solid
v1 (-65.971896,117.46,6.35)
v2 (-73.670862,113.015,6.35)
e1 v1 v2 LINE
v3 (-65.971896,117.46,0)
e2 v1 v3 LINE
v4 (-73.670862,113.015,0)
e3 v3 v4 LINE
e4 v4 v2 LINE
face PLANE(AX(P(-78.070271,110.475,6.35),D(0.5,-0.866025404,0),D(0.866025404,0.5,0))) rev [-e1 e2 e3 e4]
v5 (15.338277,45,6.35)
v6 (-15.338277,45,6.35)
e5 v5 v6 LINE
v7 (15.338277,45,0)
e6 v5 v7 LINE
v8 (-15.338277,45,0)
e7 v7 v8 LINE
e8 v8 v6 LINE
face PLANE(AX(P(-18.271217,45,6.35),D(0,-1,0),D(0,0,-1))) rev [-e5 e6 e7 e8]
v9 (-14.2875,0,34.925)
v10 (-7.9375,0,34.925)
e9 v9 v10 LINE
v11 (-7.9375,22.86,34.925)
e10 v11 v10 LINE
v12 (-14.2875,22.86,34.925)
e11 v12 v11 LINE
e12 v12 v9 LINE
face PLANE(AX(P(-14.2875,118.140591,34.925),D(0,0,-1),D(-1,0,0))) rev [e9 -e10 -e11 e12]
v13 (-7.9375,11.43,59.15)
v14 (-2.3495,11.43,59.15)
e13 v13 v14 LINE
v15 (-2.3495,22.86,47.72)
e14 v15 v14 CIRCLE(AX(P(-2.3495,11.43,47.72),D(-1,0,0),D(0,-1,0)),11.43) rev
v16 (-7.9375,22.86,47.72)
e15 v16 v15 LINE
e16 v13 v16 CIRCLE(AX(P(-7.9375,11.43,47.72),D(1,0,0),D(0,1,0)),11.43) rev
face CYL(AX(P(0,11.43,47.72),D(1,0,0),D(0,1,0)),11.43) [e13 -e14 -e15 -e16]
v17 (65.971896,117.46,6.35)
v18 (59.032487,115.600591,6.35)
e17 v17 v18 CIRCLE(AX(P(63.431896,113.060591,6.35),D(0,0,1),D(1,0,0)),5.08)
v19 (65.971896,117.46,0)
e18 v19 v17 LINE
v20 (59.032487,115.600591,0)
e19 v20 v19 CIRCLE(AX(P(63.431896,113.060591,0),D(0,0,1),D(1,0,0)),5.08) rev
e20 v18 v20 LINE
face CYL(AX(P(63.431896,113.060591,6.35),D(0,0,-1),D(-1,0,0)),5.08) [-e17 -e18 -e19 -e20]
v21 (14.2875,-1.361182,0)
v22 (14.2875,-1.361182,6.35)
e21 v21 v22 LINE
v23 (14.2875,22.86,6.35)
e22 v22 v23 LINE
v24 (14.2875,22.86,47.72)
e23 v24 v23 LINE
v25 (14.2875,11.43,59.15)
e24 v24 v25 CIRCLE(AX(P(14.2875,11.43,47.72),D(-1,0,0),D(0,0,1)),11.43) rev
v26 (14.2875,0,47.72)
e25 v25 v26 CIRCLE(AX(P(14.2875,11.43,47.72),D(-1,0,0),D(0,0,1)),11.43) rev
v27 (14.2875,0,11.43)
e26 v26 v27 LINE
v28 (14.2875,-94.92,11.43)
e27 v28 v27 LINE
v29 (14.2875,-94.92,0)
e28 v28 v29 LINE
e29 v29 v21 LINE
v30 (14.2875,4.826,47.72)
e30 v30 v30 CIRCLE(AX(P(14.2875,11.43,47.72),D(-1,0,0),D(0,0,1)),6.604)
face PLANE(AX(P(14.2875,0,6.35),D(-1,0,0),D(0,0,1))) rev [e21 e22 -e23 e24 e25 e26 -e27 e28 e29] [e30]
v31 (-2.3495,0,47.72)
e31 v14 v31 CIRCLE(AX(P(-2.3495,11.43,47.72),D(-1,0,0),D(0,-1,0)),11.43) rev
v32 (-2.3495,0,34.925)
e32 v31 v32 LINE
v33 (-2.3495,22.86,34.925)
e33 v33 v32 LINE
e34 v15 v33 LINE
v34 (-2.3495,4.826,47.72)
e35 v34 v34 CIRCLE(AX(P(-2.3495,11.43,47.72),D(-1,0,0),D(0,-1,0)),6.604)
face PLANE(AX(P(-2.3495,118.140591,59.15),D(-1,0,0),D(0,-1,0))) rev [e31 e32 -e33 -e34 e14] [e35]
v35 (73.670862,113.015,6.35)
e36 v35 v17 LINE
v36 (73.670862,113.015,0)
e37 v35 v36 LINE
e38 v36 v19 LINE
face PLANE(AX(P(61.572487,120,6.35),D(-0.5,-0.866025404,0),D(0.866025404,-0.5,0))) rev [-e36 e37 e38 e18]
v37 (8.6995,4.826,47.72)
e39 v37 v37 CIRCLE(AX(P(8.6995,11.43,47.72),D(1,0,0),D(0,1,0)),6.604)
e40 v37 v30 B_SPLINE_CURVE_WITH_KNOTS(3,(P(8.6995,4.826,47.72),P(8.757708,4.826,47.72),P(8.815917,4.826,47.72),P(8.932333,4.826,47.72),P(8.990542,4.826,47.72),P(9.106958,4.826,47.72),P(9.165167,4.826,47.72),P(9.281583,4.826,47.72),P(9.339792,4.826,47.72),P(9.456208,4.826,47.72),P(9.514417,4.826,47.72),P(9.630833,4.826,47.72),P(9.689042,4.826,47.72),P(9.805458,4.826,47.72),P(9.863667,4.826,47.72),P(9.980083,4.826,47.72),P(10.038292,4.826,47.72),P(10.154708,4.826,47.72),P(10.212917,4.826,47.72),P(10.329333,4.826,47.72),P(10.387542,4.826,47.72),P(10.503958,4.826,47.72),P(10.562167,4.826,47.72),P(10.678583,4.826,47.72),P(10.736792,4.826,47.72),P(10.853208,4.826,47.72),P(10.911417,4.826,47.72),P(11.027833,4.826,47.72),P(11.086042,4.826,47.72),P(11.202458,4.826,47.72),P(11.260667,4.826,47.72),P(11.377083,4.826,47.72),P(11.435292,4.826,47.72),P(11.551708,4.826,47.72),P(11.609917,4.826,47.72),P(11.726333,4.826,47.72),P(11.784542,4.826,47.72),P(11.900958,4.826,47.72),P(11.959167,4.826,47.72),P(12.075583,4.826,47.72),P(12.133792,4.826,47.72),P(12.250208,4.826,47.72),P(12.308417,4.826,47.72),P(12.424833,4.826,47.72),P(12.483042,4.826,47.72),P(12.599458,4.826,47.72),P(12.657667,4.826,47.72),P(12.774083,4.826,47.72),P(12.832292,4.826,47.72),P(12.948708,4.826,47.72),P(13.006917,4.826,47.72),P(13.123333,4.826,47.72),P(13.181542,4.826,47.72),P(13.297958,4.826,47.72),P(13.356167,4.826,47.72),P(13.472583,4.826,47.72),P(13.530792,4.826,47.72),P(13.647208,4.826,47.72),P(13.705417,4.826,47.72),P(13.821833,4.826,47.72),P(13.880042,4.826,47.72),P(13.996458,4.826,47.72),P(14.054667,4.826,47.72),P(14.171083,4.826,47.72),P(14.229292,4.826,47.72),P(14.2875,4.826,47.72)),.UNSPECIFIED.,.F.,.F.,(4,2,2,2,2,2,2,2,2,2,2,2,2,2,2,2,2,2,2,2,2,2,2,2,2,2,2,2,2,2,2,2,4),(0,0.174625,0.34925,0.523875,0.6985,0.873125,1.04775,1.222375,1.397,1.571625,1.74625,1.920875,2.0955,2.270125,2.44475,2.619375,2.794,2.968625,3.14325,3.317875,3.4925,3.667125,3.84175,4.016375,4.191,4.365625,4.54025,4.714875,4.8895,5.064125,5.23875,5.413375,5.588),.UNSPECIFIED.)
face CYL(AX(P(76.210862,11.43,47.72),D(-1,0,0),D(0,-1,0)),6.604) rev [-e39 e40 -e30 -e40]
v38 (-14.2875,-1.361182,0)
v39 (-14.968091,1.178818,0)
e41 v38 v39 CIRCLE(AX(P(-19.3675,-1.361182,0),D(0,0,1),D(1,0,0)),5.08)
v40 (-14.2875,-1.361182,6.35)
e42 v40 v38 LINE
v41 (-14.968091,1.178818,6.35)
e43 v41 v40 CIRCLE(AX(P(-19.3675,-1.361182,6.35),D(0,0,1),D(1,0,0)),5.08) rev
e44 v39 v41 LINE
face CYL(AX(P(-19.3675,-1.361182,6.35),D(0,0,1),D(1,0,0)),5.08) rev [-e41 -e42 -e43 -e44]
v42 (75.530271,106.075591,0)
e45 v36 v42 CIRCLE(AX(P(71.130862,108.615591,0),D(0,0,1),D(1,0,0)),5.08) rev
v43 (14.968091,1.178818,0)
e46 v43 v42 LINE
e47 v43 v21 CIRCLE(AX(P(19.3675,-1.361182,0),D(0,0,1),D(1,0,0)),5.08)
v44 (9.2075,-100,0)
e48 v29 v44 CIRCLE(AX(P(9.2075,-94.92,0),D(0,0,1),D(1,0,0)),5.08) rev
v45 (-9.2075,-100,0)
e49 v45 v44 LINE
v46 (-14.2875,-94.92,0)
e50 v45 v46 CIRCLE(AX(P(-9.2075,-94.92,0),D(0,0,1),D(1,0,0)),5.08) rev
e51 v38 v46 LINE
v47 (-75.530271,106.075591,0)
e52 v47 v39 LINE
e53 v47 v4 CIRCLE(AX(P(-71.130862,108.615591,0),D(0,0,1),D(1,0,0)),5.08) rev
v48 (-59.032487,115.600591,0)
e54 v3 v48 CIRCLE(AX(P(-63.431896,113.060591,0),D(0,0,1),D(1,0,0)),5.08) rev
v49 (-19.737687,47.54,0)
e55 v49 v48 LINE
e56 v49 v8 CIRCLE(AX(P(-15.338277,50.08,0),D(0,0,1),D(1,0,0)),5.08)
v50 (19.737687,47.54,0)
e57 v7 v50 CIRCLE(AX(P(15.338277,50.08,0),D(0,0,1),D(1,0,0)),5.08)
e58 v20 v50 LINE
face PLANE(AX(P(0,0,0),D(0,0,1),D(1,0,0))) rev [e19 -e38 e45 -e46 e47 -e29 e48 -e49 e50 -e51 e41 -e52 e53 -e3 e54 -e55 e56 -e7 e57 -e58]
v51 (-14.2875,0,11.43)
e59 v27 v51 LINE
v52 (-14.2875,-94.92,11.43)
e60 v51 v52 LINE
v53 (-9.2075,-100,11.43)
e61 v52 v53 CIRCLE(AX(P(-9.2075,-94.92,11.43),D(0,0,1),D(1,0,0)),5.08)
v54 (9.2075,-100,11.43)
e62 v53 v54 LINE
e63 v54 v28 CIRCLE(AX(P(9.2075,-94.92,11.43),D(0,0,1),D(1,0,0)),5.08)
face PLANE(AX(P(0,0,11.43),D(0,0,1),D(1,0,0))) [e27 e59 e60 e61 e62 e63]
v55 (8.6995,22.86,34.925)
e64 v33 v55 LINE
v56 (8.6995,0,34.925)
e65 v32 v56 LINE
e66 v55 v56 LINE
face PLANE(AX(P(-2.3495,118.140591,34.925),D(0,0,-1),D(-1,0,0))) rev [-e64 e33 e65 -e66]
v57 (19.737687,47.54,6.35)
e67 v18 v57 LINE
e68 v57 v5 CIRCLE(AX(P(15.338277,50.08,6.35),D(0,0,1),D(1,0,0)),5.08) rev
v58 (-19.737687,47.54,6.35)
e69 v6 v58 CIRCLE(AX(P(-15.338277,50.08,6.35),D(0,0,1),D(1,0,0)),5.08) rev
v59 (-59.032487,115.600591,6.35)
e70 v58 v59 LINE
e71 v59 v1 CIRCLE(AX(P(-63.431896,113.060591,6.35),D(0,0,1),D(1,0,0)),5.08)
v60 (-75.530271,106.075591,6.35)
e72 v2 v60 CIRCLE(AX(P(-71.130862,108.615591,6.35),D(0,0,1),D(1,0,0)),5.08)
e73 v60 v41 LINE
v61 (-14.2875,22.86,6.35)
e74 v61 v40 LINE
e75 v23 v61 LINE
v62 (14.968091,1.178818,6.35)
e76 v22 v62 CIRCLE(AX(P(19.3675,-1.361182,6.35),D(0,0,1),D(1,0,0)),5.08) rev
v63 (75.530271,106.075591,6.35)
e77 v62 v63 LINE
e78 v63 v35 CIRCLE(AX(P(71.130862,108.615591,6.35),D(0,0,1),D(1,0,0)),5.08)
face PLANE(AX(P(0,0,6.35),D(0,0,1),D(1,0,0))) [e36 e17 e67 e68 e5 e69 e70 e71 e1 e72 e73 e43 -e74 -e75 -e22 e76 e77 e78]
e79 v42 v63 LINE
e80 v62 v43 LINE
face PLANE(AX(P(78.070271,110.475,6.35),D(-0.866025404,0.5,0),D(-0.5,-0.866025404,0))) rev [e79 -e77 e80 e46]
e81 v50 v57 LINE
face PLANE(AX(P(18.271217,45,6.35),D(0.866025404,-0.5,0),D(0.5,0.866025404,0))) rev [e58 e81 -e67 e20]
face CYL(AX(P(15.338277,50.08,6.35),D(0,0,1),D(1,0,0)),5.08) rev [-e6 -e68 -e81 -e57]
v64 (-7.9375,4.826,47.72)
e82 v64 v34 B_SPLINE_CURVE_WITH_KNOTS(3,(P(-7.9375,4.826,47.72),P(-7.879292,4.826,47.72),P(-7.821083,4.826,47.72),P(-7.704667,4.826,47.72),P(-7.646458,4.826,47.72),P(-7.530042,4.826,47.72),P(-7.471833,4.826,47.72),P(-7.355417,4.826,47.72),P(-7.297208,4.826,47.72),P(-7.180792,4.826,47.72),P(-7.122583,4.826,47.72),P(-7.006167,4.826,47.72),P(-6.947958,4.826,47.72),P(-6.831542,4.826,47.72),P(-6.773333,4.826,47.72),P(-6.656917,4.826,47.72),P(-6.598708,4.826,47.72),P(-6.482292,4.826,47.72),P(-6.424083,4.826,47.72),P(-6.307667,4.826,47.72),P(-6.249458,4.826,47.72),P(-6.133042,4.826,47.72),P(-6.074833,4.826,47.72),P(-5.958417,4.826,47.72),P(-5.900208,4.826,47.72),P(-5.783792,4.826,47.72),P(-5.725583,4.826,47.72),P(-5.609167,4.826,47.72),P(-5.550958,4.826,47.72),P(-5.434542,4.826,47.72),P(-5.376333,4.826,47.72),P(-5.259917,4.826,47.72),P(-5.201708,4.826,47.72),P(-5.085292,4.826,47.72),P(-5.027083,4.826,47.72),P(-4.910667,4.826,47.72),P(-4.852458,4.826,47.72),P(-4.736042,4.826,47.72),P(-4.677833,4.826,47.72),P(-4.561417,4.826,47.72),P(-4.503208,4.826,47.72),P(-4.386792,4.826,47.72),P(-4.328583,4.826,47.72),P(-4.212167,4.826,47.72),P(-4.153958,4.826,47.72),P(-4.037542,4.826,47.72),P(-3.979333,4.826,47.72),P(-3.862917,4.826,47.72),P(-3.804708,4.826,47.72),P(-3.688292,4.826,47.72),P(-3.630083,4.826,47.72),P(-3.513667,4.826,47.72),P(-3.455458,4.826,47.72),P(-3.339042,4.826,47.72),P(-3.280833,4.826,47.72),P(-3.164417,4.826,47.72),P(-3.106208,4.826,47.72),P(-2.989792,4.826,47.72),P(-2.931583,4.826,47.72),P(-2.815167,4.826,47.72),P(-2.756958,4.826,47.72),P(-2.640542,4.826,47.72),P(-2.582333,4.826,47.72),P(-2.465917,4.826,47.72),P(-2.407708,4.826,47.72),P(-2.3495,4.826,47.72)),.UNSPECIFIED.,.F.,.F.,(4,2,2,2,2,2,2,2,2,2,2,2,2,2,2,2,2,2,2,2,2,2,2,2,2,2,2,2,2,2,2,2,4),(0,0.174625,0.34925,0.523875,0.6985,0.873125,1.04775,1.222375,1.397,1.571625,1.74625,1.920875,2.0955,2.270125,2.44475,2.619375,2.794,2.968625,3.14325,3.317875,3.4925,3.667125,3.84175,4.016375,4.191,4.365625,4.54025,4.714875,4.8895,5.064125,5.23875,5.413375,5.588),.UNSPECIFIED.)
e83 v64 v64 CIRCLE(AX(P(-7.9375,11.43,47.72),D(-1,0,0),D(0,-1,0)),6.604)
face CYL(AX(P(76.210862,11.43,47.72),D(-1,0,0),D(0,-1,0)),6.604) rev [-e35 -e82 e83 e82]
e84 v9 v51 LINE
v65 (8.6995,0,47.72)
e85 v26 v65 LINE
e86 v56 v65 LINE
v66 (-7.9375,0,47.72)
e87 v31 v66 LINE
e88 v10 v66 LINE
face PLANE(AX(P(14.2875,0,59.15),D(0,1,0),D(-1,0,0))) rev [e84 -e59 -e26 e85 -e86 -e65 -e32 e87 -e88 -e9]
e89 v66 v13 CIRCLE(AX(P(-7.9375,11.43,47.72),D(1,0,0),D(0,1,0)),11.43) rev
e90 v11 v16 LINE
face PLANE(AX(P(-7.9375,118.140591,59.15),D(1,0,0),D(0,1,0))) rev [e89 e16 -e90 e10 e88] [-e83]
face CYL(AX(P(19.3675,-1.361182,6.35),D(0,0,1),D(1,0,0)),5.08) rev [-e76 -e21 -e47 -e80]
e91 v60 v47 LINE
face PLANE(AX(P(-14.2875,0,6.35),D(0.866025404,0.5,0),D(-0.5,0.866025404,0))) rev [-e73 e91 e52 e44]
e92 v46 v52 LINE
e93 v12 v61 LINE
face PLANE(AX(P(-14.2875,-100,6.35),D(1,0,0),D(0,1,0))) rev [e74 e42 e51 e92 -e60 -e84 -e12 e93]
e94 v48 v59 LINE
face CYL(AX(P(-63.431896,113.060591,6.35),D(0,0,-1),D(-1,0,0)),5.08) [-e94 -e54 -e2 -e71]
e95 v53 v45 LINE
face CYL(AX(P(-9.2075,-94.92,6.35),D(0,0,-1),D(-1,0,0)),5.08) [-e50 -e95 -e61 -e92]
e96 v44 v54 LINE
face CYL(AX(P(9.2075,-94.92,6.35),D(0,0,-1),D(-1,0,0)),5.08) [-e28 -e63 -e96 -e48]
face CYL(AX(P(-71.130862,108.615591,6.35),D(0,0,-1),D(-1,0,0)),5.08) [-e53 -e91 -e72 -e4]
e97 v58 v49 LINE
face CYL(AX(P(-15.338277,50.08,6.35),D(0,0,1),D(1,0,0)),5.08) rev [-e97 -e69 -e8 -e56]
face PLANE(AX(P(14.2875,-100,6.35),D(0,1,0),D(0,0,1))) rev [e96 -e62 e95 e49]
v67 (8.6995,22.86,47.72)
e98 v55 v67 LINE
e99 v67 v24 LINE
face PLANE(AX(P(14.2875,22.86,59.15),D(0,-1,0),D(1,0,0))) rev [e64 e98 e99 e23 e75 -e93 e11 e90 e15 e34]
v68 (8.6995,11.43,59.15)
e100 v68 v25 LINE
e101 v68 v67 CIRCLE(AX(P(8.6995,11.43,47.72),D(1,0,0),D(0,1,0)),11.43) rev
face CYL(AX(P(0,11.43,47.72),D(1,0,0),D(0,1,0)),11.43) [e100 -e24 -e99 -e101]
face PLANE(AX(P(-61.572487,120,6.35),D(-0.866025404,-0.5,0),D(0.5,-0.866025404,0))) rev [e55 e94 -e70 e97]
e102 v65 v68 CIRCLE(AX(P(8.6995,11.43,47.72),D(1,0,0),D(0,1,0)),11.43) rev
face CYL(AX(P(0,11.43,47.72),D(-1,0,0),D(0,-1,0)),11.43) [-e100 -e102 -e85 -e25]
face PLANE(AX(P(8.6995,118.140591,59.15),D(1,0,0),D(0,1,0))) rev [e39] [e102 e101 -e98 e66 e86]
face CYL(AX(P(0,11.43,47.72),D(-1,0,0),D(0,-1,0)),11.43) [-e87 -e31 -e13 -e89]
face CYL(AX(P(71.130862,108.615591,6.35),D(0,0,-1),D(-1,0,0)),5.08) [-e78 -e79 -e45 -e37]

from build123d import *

# Parameters (mm, degrees)
BOSS_EXTRUDE1_DEPTH = 6.35
SKETCH3_W           = 28.575
SKETCH3_H           = 22.86
BOSS_EXTRUDE2_DEPTH = 52.8
SKETCH6_W           = 28.575
SKETCH6_H           = 100
BOSS_EXTRUDE3_DEPTH = 5.08
FILLET1_R           = 5.08
SKETCH4_W           = 6.35
SKETCH4_H           = 24.225
SKETCH4_W_2         = 11.049
CUT_EXTRUDE1_DEPTH  = 153.525464126
FILLET3_R           = 11.43
SKETCH5_R           = 6.604
CUT_EXTRUDE2_DEPTH  = 157.642486403


with BuildPart() as part:
    # Sketch1 → Boss-Extrude1 (new body)
    with BuildSketch(Plane.XY):
        Polygon((-18.271216857, 45), (18.271216857, 45), (61.572487047, 120), (78.070270989, 110.475), (14.2875, 0), (14.2875, -100), (-14.2875, -100), (-14.2875, 0), (-78.070270989, 110.475), (-61.572487047, 120), align=None)
    extrude(amount=BOSS_EXTRUDE1_DEPTH)

    # Sketch3 → Boss-Extrude2 (add)
    with BuildSketch(Plane.XY.offset(6.35)):
        with Locations((0, 11.43)):
            Rectangle(SKETCH3_W, SKETCH3_H)
    extrude(amount=BOSS_EXTRUDE2_DEPTH)

    # Sketch6 → Boss-Extrude3 (add)
    with BuildSketch(Plane.XY.offset(6.35)):
        with Locations((0, -50)):
            Rectangle(SKETCH6_W, SKETCH6_H)
    extrude(amount=BOSS_EXTRUDE3_DEPTH)

    # Fillet1
    fillet1_edges = [part.edges().sort_by_distance(p)[0] for p in [
        (-18.271216857, 45, 3.175),
        (18.271216857, 45, 3.175),
        (61.572487047, 120, 3.175),
        (78.070270989, 110.475, 3.175),
        (14.2875, 0, 3.175),
        (14.2875, -100, 5.715),
        (-14.2875, -100, 5.715),
        (-14.2875, 0, 3.175),
        (-78.070270989, 110.475, 3.175),
        (-61.572487047, 120, 3.175),
    ]]
    fillet(fillet1_edges, radius=FILLET1_R)

    # Sketch4 → Cut-Extrude1 (cut, through all)
    with BuildSketch(Plane.XZ):
        with Locations((-11.1125, 47.0375)):
            Rectangle(SKETCH4_W, SKETCH4_H)
        with Locations((3.175, 47.0375)):
            Rectangle(SKETCH4_W_2, SKETCH4_H)
    extrude(amount=-CUT_EXTRUDE1_DEPTH, mode=Mode.SUBTRACT)

    # Fillet3
    fillet3_edges = [part.edges().sort_by_distance(p)[0] for p in [
        (11.4935, 22.86, 59.15),
        (-5.1435, 22.86, 59.15),
        (11.4935, 0, 59.15),
        (-5.1435, 0, 59.15),
    ]]
    fillet(fillet3_edges, radius=FILLET3_R - 0.0001)  # a hair under: the kernel refuses the full size

    # Sketch5 → Cut-Extrude2 (cut, through all)
    with BuildSketch(Plane.ZY.offset(7.9375)):
        with Locations(Location((47.72, 11.43, 0), (0, 0, 270))):
            Circle(SKETCH5_R)
    extrude(amount=-CUT_EXTRUDE2_DEPTH, mode=Mode.SUBTRACT)


solid = part.part
